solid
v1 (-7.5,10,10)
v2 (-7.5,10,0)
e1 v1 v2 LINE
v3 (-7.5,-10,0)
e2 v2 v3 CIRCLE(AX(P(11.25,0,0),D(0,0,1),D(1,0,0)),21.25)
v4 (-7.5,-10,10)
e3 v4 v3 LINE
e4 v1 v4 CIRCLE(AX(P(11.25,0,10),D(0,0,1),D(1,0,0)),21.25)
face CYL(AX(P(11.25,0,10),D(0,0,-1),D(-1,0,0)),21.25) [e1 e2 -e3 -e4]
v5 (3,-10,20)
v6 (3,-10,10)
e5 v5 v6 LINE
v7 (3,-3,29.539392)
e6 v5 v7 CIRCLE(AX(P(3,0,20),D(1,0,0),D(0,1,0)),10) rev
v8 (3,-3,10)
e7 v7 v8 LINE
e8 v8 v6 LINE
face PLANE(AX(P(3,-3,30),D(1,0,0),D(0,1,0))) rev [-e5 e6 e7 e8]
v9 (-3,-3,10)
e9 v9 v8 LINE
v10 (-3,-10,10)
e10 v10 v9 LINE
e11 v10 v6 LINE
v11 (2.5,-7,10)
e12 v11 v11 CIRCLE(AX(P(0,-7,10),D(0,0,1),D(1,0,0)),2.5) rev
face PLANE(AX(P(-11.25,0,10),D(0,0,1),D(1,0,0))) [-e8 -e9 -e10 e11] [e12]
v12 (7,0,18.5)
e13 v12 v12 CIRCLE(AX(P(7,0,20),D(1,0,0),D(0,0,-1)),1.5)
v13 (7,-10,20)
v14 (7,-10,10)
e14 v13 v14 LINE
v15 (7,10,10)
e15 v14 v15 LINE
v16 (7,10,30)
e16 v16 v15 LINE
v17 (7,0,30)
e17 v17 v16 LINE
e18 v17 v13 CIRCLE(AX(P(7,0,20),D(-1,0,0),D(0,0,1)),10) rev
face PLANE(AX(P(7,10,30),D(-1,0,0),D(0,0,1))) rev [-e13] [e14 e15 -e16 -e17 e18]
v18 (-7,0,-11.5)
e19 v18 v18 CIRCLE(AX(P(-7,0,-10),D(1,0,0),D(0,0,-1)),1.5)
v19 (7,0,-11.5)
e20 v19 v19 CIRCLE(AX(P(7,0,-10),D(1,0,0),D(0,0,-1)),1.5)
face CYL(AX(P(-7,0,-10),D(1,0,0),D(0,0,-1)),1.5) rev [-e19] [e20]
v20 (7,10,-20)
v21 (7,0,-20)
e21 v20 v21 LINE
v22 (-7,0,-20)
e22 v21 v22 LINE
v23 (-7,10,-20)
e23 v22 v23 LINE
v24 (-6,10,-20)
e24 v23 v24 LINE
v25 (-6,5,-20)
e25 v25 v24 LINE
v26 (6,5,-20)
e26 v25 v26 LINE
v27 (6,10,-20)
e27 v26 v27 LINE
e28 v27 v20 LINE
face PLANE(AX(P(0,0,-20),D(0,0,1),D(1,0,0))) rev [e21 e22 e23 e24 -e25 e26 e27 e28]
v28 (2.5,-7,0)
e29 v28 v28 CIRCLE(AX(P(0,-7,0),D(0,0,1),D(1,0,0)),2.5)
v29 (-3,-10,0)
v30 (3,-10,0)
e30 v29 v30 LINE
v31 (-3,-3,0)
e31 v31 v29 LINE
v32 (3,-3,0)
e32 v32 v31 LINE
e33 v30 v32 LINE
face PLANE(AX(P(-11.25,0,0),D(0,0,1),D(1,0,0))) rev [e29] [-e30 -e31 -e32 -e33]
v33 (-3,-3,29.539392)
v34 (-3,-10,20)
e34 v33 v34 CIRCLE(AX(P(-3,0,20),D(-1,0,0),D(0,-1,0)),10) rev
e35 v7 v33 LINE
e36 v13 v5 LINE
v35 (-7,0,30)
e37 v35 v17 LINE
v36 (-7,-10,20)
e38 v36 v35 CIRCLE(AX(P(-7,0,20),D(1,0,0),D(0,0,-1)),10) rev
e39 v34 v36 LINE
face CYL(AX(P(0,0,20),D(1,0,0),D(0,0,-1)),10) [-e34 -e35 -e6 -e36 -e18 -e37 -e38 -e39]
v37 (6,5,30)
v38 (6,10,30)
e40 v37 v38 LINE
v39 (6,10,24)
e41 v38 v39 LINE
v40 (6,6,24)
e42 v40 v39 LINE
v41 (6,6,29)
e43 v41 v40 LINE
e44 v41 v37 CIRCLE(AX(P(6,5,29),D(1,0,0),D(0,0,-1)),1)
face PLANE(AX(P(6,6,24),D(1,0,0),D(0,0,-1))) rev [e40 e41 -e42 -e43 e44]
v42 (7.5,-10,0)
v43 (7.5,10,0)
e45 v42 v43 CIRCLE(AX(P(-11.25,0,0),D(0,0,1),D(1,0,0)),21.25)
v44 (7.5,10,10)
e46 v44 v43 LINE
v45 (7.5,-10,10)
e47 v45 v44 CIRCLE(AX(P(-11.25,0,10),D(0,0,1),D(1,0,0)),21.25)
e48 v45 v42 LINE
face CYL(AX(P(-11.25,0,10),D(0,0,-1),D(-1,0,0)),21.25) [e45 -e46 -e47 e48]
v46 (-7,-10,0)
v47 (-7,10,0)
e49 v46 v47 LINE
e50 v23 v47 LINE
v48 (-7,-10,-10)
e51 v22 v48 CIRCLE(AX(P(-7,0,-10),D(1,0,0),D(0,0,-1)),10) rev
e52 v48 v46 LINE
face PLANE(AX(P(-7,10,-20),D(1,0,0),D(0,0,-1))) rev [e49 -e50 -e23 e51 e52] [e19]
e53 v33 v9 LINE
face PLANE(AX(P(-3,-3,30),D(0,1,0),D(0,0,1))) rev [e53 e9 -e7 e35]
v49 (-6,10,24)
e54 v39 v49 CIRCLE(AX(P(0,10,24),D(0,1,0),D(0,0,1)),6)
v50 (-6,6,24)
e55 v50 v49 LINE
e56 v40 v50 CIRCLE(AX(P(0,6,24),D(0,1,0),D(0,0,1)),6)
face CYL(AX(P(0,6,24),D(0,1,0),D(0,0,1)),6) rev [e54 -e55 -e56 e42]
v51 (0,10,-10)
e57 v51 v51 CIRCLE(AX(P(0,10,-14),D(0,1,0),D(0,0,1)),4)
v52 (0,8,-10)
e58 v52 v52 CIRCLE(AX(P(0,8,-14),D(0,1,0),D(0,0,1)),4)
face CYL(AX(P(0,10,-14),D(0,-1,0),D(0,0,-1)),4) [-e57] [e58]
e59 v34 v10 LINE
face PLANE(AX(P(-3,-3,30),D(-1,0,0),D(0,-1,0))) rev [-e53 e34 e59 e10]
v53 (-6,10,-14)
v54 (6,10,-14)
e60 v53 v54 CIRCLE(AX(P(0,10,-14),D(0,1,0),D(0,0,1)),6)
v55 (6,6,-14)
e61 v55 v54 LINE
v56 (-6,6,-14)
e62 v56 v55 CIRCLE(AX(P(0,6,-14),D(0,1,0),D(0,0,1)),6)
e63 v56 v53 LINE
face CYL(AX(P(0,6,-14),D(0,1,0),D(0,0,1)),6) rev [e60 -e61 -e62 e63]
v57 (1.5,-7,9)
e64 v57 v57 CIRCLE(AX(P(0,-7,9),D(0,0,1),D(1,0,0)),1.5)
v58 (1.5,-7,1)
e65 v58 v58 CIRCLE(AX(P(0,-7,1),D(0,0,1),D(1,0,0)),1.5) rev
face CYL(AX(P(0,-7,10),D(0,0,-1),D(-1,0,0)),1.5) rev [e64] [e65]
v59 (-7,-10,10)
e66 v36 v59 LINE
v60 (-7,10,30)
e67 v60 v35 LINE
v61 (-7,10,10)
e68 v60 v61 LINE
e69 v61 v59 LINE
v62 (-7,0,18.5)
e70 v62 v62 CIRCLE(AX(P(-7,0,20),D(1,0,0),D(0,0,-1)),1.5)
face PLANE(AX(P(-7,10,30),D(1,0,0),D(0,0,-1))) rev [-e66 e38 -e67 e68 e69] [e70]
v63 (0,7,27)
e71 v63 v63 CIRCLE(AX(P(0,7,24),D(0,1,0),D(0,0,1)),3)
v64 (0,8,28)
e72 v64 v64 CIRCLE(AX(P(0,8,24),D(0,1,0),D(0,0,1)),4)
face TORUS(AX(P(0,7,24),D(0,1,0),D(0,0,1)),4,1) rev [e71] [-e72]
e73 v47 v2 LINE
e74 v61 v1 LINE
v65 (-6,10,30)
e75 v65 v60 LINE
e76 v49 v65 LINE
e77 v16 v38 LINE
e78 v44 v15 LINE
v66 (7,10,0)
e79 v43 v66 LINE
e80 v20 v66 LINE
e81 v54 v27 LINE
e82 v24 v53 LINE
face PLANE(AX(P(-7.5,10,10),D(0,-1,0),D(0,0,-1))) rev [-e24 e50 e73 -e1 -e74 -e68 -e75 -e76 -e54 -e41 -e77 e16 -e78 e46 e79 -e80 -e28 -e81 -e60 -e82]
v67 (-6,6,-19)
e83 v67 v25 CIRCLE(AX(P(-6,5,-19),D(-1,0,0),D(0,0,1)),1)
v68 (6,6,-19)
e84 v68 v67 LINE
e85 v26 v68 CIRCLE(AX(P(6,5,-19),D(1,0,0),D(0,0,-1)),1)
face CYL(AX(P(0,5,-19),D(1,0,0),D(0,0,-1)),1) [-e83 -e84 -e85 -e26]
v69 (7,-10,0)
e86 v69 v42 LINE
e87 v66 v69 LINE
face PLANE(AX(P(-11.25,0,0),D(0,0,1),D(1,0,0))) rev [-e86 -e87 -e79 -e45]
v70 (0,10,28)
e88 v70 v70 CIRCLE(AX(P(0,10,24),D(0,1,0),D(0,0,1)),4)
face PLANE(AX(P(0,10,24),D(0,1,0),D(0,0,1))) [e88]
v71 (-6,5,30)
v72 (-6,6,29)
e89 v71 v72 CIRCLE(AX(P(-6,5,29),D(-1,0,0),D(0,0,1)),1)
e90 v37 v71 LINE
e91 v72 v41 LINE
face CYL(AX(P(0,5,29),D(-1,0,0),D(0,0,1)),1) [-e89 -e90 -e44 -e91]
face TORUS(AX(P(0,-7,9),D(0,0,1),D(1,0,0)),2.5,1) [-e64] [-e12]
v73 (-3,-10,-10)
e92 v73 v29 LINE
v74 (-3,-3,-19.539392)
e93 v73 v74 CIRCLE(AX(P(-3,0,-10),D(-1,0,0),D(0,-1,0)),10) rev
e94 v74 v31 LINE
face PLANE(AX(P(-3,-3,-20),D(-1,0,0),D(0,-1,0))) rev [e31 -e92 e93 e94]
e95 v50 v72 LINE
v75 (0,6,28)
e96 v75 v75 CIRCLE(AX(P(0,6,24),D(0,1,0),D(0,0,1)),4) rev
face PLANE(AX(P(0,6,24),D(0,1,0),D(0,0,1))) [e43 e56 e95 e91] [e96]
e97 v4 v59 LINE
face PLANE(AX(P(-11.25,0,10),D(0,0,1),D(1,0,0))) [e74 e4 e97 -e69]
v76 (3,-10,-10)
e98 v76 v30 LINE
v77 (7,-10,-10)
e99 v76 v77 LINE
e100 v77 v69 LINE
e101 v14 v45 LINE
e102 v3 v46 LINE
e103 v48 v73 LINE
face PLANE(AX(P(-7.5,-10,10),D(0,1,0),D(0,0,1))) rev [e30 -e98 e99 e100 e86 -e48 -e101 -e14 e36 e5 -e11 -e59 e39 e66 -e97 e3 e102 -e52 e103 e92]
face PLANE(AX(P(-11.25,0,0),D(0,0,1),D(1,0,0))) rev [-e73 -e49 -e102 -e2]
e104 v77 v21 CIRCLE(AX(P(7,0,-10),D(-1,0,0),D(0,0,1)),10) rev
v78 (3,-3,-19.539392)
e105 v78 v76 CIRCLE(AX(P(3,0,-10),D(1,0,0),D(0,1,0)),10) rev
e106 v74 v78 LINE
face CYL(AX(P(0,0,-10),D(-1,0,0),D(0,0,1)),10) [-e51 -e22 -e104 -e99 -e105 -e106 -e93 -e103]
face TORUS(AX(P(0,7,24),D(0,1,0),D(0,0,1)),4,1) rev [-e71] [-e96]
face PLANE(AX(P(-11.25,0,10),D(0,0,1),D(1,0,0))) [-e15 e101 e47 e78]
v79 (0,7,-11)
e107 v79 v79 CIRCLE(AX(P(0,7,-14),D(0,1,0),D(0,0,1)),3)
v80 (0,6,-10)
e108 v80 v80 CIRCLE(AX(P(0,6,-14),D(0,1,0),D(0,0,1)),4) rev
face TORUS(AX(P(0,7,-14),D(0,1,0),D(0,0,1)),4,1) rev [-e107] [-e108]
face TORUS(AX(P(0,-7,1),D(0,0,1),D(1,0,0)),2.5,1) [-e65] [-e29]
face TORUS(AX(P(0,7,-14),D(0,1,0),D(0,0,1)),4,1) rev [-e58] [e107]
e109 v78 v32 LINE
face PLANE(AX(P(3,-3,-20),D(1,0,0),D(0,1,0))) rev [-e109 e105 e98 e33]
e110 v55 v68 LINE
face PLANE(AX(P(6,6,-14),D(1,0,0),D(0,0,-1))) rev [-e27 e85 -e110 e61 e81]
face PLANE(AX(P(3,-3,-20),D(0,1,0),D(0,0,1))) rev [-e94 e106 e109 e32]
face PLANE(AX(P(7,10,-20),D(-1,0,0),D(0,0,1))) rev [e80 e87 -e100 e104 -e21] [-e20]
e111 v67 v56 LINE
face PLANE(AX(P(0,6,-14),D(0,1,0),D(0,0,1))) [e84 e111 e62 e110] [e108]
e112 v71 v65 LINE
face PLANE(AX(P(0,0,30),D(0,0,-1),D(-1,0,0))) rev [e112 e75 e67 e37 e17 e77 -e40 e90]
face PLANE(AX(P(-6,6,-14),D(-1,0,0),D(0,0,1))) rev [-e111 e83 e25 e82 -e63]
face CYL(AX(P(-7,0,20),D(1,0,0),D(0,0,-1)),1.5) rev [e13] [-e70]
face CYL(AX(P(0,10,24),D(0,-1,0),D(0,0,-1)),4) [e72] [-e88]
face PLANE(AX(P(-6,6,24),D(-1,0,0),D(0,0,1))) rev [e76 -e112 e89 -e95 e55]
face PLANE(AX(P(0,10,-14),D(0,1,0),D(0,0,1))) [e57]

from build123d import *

# Parameters (mm, degrees)
SALIENTE_EXTRUIR1_DEPTH = 10
CROQUIS3_R              = 1.5
CORTAR_EXTRUIR1_DEPTH   = 10
SALIENTE_EXTRUIR2_DEPTH = 20
SALIENTE_EXTRUIR3_DEPTH = 20
CROQUIS6_R              = 1.5
CORTAR_EXTRUIR2_DEPTH   = 14
REDONDEO1_R             = 10
CUT_EXTRUDE1_DEPTH      = 4
SKETCH2_R               = 3
BOSS_EXTRUDE1_DEPTH     = 2
SKETCH3_R               = 4
BOSS_EXTRUDE2_DEPTH     = 2
FILLET1_R               = 1
FILLET2_R               = 1
FILLET3_R               = 1


with BuildPart() as part:
    # Croquis2 → Saliente-Extruir1 (new body)
    with BuildSketch(Plane.XY):
        with BuildLine():
            Line((-7.5, 10), (7.5, 10))
            ThreePointArc((7.5, 10), (10, 0), (7.5, -10))
            Line((7.5, -10), (-7.5, -10))
            ThreePointArc((-7.5, -10), (-10, 0), (-7.5, 10))
        make_face()
    extrude(amount=SALIENTE_EXTRUIR1_DEPTH)

    # Croquis3 → Cortar-Extruir1 (cut)
    with BuildSketch(Plane(origin=(0, 0, 0), x_dir=(-1, 0, 0), z_dir=(0, 0, -1))):
        with Locations((0, -7)):
            Circle(CROQUIS3_R)
    extrude(amount=-CORTAR_EXTRUIR1_DEPTH, mode=Mode.SUBTRACT)

    # Croquis4 → Saliente-Extruir2 (add)
    with BuildSketch(Plane(origin=(0, 0, 0), x_dir=(-1, 0, 0), z_dir=(0, 0, -1))):
        Polygon((-7, 10), (-7, -10), (-3, -10), (-3, -3), (3, -3), (3, -10), (7, -10), (7, 10), align=None)
    extrude(amount=SALIENTE_EXTRUIR2_DEPTH)

    # Croquis5 → Saliente-Extruir3 (add)
    with BuildSketch(Plane.XY.offset(10)):
        Polygon((-7, 10), (-7, -10), (-3, -10), (-3, -3), (3, -3), (3, -10), (7, -10), (7, 10), align=None)
    extrude(amount=SALIENTE_EXTRUIR3_DEPTH)

    # Croquis6 → Cortar-Extruir2 (cut)
    with BuildSketch(Plane(origin=(7, 0, 0), x_dir=(0, 0, -1), z_dir=(1, 0, 0))):
        with Locations((-20, 0)):
            Circle(CROQUIS6_R)
        with Locations((10, 0)):
            Circle(CROQUIS6_R)
    extrude(amount=-CORTAR_EXTRUIR2_DEPTH, mode=Mode.SUBTRACT)

    # Redondeo1
    redondeo1_edges = [part.edges().sort_by_distance(p)[0] for p in [
        (-5, -10, 30),
        (-5, -10, -20),
    ]]
    fillet(redondeo1_edges, radius=REDONDEO1_R)

    # Sketch1 → Cut-Extrude1 (cut)
    with BuildSketch(Plane(origin=(0, 10, 0), x_dir=(1, 0, 0), z_dir=(0, 1, 0))):
        with BuildLine():
            Line((-6, 14), (-6, 20))
            Line((-6, 20), (6, 20))
            Line((6, 20), (6, 14))
            ThreePointArc((6, 14), (0, 8), (-6, 14))
        make_face()
        with BuildLine():
            Line((-6, -24), (-6, -30))
            Line((-6, -30), (6, -30))
            Line((6, -30), (6, -24))
            ThreePointArc((6, -24), (0, -18), (-6, -24))
        make_face()
    extrude(amount=-CUT_EXTRUDE1_DEPTH, mode=Mode.SUBTRACT)

    # Sketch2 → Boss-Extrude1 (add)
    with BuildSketch(Plane(origin=(0, 6, 0), x_dir=(1, 0, 0), z_dir=(0, 1, 0))):
        with Locations(Location((0, 14, 0), (0, 0, 270))):
            Circle(SKETCH2_R)
        with Locations(Location((0, -24, 0), (0, 0, 270))):
            Circle(SKETCH2_R)
    extrude(amount=BOSS_EXTRUDE1_DEPTH)

    # Sketch3 → Boss-Extrude2 (add)
    with BuildSketch(Plane(origin=(0, 8, 0), x_dir=(1, 0, 0), z_dir=(0, 1, 0))):
        with Locations(Location((0, -24, 0), (0, 0, 270))):
            Circle(SKETCH3_R)
        with Locations(Location((0, 14, 0), (0, 0, 270))):
            Circle(SKETCH3_R)
    extrude(amount=BOSS_EXTRUDE2_DEPTH)

    # Fillet1
    fillet1_edges = [part.edges().sort_by_distance(p)[0] for p in [
        (0, 6, -17),
        (0, 8, -17),
        (0, 6, 21),
        (0, 8, 21),
    ]]
    fillet(fillet1_edges, radius=FILLET1_R - 0.0001)  # a hair under: the kernel refuses the full size

    # Fillet2
    fillet2_edges = [part.edges().sort_by_distance(p)[0] for p in [
        (0, 6, -20),
        (0, 6, 30),
    ]]
    fillet(fillet2_edges, radius=FILLET2_R)

    # Fillet3
    fillet3_edges = [part.edges().sort_by_distance(p)[0] for p in [
        (1.5, -7, 10),
        (1.5, -7, 0),
    ]]
    fillet(fillet3_edges, radius=FILLET3_R)


solid = part.part
